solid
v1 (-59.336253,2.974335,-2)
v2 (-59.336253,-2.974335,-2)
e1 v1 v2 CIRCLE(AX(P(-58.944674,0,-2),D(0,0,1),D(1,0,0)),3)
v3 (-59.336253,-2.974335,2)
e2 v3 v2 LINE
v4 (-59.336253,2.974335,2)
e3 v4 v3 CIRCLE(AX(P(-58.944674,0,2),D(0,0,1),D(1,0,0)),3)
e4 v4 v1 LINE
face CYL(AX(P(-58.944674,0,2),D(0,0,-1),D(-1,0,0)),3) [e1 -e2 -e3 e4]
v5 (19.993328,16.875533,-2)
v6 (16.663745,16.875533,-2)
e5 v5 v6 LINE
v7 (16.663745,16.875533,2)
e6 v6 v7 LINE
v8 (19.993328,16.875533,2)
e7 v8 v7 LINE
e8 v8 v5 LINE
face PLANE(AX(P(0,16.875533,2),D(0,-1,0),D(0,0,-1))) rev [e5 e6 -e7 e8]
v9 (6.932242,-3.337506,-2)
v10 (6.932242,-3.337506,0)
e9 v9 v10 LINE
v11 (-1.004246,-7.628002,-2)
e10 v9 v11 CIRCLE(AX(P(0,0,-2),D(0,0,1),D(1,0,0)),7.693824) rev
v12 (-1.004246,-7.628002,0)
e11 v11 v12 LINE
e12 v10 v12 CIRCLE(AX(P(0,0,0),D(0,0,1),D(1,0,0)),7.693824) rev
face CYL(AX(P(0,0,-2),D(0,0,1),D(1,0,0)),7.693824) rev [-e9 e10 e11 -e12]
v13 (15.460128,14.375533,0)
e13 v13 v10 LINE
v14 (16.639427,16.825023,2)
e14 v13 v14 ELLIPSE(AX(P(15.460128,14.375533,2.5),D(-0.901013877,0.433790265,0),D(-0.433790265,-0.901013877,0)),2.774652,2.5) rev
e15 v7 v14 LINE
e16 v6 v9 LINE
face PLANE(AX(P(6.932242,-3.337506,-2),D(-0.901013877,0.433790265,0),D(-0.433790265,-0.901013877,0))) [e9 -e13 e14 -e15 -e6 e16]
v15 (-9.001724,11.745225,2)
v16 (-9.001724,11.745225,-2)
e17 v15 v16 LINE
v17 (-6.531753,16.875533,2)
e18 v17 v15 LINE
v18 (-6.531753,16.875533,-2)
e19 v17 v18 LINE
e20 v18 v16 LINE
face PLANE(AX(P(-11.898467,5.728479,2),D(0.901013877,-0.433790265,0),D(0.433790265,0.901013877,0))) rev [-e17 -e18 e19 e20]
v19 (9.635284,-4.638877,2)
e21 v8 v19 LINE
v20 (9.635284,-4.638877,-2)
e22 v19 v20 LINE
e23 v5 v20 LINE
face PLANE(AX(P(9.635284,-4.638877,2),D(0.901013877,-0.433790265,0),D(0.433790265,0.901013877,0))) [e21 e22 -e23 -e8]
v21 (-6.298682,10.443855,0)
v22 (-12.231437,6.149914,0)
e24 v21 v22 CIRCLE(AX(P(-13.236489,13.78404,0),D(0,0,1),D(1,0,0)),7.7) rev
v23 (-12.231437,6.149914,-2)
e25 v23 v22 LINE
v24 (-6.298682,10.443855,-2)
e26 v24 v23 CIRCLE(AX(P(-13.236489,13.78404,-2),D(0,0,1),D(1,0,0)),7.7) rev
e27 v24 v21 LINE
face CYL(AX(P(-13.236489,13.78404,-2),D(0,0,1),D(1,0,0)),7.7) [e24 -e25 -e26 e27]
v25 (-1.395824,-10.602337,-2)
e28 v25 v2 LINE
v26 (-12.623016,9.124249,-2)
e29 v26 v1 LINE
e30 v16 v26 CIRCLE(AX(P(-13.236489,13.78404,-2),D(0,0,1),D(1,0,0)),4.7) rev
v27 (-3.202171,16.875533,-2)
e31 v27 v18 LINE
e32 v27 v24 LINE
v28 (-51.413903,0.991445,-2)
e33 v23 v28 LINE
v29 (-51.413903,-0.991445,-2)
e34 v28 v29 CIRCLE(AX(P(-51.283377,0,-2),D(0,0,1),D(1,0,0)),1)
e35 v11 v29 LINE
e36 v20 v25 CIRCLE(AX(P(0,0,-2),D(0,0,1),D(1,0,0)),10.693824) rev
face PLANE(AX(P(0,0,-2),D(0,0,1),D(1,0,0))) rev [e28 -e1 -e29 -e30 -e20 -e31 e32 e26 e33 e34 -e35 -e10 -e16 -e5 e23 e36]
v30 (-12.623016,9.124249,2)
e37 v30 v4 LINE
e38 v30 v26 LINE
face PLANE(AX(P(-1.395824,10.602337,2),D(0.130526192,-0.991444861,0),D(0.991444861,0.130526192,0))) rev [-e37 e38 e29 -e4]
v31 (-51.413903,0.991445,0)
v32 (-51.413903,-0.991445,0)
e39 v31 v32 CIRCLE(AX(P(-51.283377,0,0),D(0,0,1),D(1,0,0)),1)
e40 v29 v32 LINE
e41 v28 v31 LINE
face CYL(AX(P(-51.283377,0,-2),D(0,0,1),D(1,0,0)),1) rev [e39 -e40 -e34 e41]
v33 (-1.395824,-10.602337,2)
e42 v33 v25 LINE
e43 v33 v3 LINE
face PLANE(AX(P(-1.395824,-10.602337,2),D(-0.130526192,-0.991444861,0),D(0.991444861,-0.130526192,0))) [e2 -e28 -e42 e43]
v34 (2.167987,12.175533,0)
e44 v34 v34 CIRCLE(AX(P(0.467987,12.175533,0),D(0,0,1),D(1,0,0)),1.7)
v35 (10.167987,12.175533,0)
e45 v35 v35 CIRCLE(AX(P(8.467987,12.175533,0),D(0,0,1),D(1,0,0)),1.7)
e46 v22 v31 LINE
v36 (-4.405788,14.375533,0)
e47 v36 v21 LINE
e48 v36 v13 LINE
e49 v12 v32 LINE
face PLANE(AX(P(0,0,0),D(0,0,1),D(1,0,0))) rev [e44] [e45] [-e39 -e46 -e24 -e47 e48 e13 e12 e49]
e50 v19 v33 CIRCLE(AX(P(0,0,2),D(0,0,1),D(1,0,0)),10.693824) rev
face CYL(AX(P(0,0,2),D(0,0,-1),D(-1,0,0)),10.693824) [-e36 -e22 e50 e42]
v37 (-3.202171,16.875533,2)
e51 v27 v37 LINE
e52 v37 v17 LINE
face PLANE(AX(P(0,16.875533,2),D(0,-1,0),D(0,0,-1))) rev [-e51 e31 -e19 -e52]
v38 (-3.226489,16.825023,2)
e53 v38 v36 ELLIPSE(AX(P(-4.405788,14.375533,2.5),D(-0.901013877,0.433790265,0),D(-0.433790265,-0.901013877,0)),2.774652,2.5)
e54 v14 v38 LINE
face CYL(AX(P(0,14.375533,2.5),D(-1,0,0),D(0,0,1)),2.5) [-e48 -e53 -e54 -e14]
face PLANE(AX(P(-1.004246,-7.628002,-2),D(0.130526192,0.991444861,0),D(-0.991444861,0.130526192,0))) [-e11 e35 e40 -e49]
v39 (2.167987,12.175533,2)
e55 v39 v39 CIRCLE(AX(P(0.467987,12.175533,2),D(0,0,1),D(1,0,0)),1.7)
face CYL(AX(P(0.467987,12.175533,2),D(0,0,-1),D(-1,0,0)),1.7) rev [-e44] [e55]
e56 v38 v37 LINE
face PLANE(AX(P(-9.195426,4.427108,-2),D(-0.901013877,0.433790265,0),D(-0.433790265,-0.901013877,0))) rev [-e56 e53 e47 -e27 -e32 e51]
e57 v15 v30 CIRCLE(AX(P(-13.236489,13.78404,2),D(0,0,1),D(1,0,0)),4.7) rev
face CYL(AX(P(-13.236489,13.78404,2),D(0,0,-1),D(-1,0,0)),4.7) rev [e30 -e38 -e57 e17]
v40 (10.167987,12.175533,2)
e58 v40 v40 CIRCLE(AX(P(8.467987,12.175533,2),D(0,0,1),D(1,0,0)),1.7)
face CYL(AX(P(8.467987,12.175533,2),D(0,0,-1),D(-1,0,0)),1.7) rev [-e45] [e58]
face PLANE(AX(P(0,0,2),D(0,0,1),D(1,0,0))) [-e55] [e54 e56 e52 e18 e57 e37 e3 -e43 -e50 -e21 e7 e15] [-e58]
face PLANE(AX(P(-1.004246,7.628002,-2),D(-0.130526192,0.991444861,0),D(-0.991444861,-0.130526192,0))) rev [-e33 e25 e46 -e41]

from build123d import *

# Parameters (mm, degrees)
ESQUISSE1_R        = 1.7
BOSS_EXTRU_1_DEPTH = 2
BOSS_EXTRU_2_START = -2
BOSS_EXTRU_2_DEPTH = 2
CONG_1_R           = 2.5


with BuildPart() as part:
    # Esquisse1 → Boss.-Extru.1 (new body)
    # profile 1 of 2: a face of its own
    with BuildSketch(Plane.XY):
        with BuildLine():
            Line((-6.298682213, 10.443854679), (-3.202171033, 16.875533229))
            Line((-3.202171033, 16.875533229), (-6.531753493, 16.875533229))
            Line((-6.531753493, 16.875533229), (-9.001723843, 11.745225474))
            ThreePointArc((-9.001723843, 11.745225474), (-10.480816133, 9.976643404), (-12.62301596, 9.124248871))
            Line((-12.62301596, 9.124248871), (-59.336252698, 2.974334584))
            ThreePointArc((-59.336252698, 2.974334584), (-61.944674121, 0), (-59.336252698, -2.974334584))
            Line((-59.336252698, -2.974334584), (-1.395824109, -10.602336719))
            ThreePointArc((-1.395824109, -10.602336719), (5.08555675, -9.407177121), (9.635283697, -4.638876688))
            Line((9.635283697, -4.638876688), (19.993327919, 16.875533229))
            Line((19.993327919, 16.875533229), (16.663745459, 16.875533229))
            Line((16.663745459, 16.875533229), (6.932242067, -3.337505893))
            ThreePointArc((6.932242067, -3.337505893), (3.658876225, -6.768127543), (-1.004245533, -7.628002135))
            Line((-1.004245533, -7.628002135), (-51.413902738, -0.991444861))
            ThreePointArc((-51.413902738, -0.991444861), (-52.283376546, 0), (-51.413902738, 0.991444861))
            Line((-51.413902738, 0.991444861), (-12.231437384, 6.149914287))
            ThreePointArc((-12.231437384, 6.149914287), (-8.721875965, 7.546390437), (-6.298682213, 10.443854679))
        make_face()
    # profile 2 of 2: a face of its own
    with BuildSketch(Plane.XY):
        with BuildLine():
            Line((16.663745459, 16.875533229), (-3.202171033, 16.875533229))
            Line((-3.202171033, 16.875533229), (-6.298682213, 10.443854679))
            ThreePointArc((-6.298682213, 10.443854679), (-8.721875965, 7.546390437), (-12.231437384, 6.149914287))
            Line((-12.231437384, 6.149914287), (-51.413902738, 0.991444861))
            ThreePointArc((-51.413902738, 0.991444861), (-52.283376546, 0), (-51.413902738, -0.991444861))
            Line((-51.413902738, -0.991444861), (-1.004245533, -7.628002135))
            ThreePointArc((-1.004245533, -7.628002135), (3.658876225, -6.768127543), (6.932242067, -3.337505893))
            Line((6.932242067, -3.337505893), (16.663745459, 16.875533229))
        make_face()
        with Locations((0.467987162, 12.175533229)):
            Circle(ESQUISSE1_R, mode=Mode.SUBTRACT)
        with Locations((8.467987162, 12.175533229)):
            Circle(ESQUISSE1_R, mode=Mode.SUBTRACT)
    extrude(amount=BOSS_EXTRU_1_DEPTH)

    # Esquisse1<5> → Boss.-Extru.2 (add)
    with BuildSketch(Plane.XY.offset(BOSS_EXTRU_2_START)):
        with BuildLine():
            Line((-6.298682213, 10.443854679), (-3.202171033, 16.875533229))
            Line((-3.202171033, 16.875533229), (-6.531753493, 16.875533229))
            Line((-6.531753493, 16.875533229), (-9.001723843, 11.745225474))
            ThreePointArc((-9.001723843, 11.745225474), (-10.480816133, 9.976643404), (-12.62301596, 9.124248871))
            Line((-12.62301596, 9.124248871), (-59.336252698, 2.974334584))
            ThreePointArc((-59.336252698, 2.974334584), (-61.944674121, 0), (-59.336252698, -2.974334584))
            Line((-59.336252698, -2.974334584), (-1.395824109, -10.602336719))
            ThreePointArc((-1.395824109, -10.602336719), (5.08555675, -9.407177121), (9.635283697, -4.638876688))
            Line((9.635283697, -4.638876688), (19.993327919, 16.875533229))
            Line((19.993327919, 16.875533229), (16.663745459, 16.875533229))
            Line((16.663745459, 16.875533229), (6.932242067, -3.337505893))
            ThreePointArc((6.932242067, -3.337505893), (3.658876225, -6.768127543), (-1.004245533, -7.628002135))
            Line((-1.004245533, -7.628002135), (-51.413902738, -0.991444861))
            ThreePointArc((-51.413902738, -0.991444861), (-52.283376546, 0), (-51.413902738, 0.991444861))
            Line((-51.413902738, 0.991444861), (-12.231437384, 6.149914287))
            ThreePointArc((-12.231437384, 6.149914287), (-8.721875965, 7.546390437), (-6.298682213, 10.443854679))
        make_face()
    extrude(amount=BOSS_EXTRU_2_DEPTH)

    # Congé1
    # the kernel refuses this fillet: 2.5 mm, written as the material it takes off along each edge
    with BuildSketch(Plane(origin=(22.913745459, 16.875533229, 0), x_dir=(0, 0, 1), z_dir=(-1, 0, 0))) as cong_1_piece_1_section:
        with BuildLine():
            CenterArc((CONG_1_R, -CONG_1_R), CONG_1_R, 90, 90)
            Line((0, -CONG_1_R), (0, 0))
            Line((0, 0), (CONG_1_R, 0))
        make_face()
    cong_1_piece_1 = extrude(amount=32.365916492, mode=Mode.PRIVATE)
    cong_1_piece_1 = split(cong_1_piece_1, bisect_by=Plane(origin=(14.522128014, 12.4272383, 0.565987786), z_dir=(-0.9010138766913354, 0.4337902650010155, 0)), keep=Keep.TOP, mode=Mode.PRIVATE)
    cong_1_piece_1 = split(cong_1_piece_1, bisect_by=Plane(origin=(-1.605539627, 20.191852587, 0.565987786), z_dir=(0.9010138766913354, -0.4337902650010154, 0)), keep=Keep.TOP, mode=Mode.PRIVATE)
    add(cong_1_piece_1, mode=Mode.SUBTRACT)


solid = part.part
